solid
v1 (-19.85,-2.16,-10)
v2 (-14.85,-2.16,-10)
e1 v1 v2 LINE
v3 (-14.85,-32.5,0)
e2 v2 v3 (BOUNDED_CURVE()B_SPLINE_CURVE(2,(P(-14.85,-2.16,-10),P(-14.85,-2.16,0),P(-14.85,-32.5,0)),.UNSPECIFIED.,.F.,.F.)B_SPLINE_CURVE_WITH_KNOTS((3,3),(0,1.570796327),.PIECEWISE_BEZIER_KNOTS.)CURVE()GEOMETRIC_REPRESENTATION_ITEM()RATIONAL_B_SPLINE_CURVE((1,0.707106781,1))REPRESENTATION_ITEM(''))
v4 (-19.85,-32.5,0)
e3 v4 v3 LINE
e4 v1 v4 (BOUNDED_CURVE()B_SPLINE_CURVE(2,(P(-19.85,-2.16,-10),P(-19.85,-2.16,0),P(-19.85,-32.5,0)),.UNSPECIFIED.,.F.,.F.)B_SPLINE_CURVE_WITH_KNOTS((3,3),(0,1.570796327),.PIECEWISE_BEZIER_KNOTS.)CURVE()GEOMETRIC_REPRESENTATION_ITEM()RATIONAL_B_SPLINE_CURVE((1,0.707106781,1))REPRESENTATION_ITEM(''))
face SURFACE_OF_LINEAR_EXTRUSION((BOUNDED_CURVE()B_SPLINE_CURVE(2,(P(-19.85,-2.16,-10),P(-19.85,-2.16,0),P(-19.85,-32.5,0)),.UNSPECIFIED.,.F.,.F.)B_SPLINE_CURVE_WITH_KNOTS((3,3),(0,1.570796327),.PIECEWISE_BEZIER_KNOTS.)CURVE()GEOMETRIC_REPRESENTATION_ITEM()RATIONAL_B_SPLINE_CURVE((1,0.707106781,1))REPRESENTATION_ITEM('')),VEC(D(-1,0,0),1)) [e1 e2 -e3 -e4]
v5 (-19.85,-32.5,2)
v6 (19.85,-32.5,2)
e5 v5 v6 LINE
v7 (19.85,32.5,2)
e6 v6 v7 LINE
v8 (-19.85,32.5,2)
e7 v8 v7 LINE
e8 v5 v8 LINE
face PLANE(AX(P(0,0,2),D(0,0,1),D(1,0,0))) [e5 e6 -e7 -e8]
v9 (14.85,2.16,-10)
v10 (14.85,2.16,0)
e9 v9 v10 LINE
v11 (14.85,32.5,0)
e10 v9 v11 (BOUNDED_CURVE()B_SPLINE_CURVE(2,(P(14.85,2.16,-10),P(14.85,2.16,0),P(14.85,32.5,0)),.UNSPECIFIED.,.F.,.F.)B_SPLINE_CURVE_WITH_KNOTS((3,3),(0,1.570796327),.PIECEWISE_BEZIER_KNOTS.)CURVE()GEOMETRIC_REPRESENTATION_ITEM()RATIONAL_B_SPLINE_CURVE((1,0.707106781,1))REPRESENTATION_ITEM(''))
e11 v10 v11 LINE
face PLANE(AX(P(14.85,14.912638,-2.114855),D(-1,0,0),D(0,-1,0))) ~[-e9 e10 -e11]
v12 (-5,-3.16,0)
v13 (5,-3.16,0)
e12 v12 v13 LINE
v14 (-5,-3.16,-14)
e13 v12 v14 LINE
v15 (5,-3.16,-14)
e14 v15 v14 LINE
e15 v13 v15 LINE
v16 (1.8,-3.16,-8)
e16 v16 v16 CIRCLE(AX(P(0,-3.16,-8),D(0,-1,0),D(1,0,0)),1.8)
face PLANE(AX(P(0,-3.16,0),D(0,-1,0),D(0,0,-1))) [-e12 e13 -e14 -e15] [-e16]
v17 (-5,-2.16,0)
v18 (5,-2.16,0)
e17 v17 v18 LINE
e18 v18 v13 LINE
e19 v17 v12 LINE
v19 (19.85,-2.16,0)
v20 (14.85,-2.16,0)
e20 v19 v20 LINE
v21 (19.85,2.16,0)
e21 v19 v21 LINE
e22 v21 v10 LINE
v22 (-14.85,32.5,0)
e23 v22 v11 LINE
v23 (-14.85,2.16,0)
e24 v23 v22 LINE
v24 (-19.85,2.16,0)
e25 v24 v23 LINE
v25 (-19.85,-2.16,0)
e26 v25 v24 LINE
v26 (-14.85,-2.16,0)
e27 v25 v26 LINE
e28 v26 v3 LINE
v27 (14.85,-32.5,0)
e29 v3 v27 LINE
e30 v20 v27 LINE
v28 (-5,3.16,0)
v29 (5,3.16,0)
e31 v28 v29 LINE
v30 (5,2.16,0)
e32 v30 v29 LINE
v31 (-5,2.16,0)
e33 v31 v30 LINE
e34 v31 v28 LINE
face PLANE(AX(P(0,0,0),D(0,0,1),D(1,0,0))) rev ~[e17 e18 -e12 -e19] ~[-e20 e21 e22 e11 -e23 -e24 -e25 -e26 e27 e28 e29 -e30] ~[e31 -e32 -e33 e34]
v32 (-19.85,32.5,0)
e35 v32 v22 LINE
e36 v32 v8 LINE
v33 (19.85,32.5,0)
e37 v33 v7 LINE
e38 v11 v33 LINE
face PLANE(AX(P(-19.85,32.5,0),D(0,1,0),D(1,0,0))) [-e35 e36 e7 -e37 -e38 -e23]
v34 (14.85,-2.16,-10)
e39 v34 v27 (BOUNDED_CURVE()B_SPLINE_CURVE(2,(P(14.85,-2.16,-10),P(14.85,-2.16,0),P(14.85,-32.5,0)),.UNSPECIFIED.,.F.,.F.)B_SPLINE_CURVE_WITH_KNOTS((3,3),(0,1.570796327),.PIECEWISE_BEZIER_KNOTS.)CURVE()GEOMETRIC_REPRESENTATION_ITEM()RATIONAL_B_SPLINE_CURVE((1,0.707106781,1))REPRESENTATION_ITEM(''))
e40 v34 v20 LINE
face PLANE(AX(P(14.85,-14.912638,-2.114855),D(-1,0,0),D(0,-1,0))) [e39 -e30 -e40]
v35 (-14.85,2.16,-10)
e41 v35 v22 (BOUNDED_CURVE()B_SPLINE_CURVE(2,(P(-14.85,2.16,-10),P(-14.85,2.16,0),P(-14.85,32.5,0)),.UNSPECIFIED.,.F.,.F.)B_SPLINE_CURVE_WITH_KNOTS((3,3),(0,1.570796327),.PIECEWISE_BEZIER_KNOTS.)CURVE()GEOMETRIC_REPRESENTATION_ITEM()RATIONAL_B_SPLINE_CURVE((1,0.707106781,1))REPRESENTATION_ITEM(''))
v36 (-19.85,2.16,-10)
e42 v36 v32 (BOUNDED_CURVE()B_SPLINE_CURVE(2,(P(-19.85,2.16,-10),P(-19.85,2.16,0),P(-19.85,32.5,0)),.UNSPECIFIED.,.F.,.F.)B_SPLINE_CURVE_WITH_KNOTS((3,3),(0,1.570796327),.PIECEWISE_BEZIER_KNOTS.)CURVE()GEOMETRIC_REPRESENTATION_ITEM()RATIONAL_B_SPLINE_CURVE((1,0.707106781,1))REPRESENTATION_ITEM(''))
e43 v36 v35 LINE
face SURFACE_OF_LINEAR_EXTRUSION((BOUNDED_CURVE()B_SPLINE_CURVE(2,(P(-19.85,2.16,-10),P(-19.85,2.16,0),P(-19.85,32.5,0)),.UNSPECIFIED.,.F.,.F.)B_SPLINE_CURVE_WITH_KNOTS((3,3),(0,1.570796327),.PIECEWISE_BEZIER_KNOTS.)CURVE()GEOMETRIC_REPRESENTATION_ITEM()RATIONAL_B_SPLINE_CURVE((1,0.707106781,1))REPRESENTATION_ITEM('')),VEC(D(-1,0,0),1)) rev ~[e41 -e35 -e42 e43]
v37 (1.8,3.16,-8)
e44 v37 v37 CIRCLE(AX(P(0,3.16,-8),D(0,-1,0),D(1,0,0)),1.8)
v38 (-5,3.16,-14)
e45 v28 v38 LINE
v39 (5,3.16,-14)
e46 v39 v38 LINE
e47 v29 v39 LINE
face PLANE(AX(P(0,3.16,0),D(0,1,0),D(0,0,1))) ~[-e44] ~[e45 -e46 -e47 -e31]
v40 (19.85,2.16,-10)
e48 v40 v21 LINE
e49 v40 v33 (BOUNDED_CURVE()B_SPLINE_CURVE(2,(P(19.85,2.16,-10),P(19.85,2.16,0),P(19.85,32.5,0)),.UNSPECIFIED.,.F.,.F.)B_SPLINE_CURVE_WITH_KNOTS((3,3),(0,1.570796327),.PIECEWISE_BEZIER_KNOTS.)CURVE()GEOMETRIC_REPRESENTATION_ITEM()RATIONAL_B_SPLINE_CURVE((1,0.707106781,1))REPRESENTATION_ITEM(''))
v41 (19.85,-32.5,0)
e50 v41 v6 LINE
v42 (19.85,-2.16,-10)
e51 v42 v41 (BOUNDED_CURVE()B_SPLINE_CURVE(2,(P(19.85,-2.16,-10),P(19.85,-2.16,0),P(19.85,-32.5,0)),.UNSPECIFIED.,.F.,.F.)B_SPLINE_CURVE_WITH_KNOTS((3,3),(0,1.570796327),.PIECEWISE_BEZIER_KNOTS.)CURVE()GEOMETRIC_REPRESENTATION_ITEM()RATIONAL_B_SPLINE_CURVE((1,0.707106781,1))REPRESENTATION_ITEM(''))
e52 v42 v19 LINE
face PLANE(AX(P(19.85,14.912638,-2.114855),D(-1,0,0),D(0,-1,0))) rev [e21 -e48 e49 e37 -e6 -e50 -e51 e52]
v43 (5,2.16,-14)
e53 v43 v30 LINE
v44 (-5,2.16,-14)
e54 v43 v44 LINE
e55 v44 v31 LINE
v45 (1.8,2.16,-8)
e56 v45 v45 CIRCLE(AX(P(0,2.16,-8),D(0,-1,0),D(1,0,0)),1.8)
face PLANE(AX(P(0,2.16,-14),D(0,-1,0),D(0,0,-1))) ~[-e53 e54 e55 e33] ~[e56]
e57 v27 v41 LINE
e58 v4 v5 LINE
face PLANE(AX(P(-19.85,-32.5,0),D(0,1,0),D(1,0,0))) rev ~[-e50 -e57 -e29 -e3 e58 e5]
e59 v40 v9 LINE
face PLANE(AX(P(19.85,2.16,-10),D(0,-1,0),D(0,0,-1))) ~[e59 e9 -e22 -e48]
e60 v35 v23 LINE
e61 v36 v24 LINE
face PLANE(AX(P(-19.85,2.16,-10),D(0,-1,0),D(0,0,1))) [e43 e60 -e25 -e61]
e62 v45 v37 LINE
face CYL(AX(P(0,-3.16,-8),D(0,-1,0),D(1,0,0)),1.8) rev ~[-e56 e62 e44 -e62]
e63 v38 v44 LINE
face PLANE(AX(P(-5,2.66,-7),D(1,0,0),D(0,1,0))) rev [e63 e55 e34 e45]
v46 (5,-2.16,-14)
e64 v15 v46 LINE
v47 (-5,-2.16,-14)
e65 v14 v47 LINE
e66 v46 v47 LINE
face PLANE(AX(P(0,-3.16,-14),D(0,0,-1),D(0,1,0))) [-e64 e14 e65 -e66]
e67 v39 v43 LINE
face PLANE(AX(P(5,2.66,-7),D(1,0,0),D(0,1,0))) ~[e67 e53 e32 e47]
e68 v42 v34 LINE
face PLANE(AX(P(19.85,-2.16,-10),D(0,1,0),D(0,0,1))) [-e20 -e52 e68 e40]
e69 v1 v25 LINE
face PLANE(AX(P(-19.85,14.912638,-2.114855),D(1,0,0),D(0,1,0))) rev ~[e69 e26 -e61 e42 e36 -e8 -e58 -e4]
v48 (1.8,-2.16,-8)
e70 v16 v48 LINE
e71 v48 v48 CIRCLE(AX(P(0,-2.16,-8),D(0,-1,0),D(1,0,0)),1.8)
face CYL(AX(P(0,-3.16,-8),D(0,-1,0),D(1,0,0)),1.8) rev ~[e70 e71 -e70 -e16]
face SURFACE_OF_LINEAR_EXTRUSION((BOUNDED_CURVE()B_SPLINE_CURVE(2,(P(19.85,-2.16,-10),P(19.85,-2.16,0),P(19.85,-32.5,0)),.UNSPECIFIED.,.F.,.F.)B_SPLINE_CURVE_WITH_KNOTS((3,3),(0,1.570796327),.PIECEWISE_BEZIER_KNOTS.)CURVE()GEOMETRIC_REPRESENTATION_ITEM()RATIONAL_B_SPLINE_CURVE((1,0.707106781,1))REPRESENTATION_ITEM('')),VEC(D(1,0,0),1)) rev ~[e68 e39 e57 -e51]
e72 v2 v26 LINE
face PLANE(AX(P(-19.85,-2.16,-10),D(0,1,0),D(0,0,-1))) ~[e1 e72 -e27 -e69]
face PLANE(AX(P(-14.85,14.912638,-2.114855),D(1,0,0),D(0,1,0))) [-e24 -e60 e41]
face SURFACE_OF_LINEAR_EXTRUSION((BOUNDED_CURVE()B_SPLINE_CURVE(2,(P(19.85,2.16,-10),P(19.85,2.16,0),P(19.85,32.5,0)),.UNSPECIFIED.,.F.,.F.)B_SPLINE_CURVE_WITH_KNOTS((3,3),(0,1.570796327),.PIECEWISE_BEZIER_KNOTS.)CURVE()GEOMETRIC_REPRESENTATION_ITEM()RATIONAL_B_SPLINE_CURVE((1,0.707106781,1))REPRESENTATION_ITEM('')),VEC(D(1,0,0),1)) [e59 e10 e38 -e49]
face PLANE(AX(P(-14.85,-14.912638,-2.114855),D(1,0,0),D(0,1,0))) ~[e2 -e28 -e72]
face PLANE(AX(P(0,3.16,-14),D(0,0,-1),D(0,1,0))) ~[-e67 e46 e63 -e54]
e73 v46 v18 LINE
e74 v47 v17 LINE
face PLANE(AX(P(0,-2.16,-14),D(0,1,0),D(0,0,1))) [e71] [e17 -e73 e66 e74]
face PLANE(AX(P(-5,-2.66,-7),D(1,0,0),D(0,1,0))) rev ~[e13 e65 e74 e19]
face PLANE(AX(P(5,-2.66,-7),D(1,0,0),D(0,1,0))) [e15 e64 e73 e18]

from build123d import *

# Parameters (mm, degrees)
F0_W             = 39.7
F0_H             = 65
F1_DEPTH         = 2
F3_DEPTH         = 5
F3_COPIES2_COUNT = 2
F5_DEPTH         = 5
F6_R             = 1.8
F7_DEPTH         = 35.6610001


# Not quite as in the source:
# - a pattern or mirror of a feature is missing from the dataset's text; its kind, count and spacing are read off the source's solid


with BuildPart() as f1:
    # F0 (on Top) → F1 (new body)
    with BuildSketch(Plane.XY):
        Rectangle(F0_W, F0_H)
    extrude(amount=F1_DEPTH)

    # F2 (on face) → F3 (join)
    with BuildSketch(Plane.YZ.offset(19.85)):
        with BuildLine():
            add(Edge.make_bspline(
                [(-2.16, -10), (-2.16, 0), (-32.5, 0)],
                knots=[0, 0, 0, 1.5707963268, 1.5707963268, 1.5707963268], degree=2, weights=[1, 0.7071067812, 1]))
            Line((-2.16, -10), (-2.16, 0))
            Line((-2.16, 0), (-32.5, 0))
        make_face()
    f3 = extrude(amount=-F3_DEPTH)

    # F3_copies: F3 across plane
    add(f3.mirror(Plane.ZX))

    # F3_copies1: F3 across plane
    add(f3.mirror(Plane(origin=(0, 0, 0), x_dir=(0, 0, -1), z_dir=(-1, 0, 0))))

    # F3_copies2: F3 ×2 about axis
    f3_copies2_axis = Axis((0, 0, 0), (0, 0, 1))
    for i in range(1, F3_COPIES2_COUNT):
        add(f3.rotate(f3_copies2_axis, i * 360 / F3_COPIES2_COUNT))

    # F4 (on Right) → F5 (join, symmetric)
    with BuildSketch(Plane.YZ):
        Polygon((-2.16, -14), (-2.16, -10), (-2.16, 0), (-3.16, 0), (-3.16, -14), align=None)
    f5 = extrude(amount=F5_DEPTH, both=True)

    # F5_copies: F5 across plane
    add(f5.mirror(Plane.ZX))

    # F6 (on face) → F7 (cut, through all)
    with BuildSketch(Plane.XZ.offset(3.16)):
        with Locations((0, -8)):
            Circle(F6_R)
    extrude(amount=-F7_DEPTH, mode=Mode.SUBTRACT)


solid = f1.part
